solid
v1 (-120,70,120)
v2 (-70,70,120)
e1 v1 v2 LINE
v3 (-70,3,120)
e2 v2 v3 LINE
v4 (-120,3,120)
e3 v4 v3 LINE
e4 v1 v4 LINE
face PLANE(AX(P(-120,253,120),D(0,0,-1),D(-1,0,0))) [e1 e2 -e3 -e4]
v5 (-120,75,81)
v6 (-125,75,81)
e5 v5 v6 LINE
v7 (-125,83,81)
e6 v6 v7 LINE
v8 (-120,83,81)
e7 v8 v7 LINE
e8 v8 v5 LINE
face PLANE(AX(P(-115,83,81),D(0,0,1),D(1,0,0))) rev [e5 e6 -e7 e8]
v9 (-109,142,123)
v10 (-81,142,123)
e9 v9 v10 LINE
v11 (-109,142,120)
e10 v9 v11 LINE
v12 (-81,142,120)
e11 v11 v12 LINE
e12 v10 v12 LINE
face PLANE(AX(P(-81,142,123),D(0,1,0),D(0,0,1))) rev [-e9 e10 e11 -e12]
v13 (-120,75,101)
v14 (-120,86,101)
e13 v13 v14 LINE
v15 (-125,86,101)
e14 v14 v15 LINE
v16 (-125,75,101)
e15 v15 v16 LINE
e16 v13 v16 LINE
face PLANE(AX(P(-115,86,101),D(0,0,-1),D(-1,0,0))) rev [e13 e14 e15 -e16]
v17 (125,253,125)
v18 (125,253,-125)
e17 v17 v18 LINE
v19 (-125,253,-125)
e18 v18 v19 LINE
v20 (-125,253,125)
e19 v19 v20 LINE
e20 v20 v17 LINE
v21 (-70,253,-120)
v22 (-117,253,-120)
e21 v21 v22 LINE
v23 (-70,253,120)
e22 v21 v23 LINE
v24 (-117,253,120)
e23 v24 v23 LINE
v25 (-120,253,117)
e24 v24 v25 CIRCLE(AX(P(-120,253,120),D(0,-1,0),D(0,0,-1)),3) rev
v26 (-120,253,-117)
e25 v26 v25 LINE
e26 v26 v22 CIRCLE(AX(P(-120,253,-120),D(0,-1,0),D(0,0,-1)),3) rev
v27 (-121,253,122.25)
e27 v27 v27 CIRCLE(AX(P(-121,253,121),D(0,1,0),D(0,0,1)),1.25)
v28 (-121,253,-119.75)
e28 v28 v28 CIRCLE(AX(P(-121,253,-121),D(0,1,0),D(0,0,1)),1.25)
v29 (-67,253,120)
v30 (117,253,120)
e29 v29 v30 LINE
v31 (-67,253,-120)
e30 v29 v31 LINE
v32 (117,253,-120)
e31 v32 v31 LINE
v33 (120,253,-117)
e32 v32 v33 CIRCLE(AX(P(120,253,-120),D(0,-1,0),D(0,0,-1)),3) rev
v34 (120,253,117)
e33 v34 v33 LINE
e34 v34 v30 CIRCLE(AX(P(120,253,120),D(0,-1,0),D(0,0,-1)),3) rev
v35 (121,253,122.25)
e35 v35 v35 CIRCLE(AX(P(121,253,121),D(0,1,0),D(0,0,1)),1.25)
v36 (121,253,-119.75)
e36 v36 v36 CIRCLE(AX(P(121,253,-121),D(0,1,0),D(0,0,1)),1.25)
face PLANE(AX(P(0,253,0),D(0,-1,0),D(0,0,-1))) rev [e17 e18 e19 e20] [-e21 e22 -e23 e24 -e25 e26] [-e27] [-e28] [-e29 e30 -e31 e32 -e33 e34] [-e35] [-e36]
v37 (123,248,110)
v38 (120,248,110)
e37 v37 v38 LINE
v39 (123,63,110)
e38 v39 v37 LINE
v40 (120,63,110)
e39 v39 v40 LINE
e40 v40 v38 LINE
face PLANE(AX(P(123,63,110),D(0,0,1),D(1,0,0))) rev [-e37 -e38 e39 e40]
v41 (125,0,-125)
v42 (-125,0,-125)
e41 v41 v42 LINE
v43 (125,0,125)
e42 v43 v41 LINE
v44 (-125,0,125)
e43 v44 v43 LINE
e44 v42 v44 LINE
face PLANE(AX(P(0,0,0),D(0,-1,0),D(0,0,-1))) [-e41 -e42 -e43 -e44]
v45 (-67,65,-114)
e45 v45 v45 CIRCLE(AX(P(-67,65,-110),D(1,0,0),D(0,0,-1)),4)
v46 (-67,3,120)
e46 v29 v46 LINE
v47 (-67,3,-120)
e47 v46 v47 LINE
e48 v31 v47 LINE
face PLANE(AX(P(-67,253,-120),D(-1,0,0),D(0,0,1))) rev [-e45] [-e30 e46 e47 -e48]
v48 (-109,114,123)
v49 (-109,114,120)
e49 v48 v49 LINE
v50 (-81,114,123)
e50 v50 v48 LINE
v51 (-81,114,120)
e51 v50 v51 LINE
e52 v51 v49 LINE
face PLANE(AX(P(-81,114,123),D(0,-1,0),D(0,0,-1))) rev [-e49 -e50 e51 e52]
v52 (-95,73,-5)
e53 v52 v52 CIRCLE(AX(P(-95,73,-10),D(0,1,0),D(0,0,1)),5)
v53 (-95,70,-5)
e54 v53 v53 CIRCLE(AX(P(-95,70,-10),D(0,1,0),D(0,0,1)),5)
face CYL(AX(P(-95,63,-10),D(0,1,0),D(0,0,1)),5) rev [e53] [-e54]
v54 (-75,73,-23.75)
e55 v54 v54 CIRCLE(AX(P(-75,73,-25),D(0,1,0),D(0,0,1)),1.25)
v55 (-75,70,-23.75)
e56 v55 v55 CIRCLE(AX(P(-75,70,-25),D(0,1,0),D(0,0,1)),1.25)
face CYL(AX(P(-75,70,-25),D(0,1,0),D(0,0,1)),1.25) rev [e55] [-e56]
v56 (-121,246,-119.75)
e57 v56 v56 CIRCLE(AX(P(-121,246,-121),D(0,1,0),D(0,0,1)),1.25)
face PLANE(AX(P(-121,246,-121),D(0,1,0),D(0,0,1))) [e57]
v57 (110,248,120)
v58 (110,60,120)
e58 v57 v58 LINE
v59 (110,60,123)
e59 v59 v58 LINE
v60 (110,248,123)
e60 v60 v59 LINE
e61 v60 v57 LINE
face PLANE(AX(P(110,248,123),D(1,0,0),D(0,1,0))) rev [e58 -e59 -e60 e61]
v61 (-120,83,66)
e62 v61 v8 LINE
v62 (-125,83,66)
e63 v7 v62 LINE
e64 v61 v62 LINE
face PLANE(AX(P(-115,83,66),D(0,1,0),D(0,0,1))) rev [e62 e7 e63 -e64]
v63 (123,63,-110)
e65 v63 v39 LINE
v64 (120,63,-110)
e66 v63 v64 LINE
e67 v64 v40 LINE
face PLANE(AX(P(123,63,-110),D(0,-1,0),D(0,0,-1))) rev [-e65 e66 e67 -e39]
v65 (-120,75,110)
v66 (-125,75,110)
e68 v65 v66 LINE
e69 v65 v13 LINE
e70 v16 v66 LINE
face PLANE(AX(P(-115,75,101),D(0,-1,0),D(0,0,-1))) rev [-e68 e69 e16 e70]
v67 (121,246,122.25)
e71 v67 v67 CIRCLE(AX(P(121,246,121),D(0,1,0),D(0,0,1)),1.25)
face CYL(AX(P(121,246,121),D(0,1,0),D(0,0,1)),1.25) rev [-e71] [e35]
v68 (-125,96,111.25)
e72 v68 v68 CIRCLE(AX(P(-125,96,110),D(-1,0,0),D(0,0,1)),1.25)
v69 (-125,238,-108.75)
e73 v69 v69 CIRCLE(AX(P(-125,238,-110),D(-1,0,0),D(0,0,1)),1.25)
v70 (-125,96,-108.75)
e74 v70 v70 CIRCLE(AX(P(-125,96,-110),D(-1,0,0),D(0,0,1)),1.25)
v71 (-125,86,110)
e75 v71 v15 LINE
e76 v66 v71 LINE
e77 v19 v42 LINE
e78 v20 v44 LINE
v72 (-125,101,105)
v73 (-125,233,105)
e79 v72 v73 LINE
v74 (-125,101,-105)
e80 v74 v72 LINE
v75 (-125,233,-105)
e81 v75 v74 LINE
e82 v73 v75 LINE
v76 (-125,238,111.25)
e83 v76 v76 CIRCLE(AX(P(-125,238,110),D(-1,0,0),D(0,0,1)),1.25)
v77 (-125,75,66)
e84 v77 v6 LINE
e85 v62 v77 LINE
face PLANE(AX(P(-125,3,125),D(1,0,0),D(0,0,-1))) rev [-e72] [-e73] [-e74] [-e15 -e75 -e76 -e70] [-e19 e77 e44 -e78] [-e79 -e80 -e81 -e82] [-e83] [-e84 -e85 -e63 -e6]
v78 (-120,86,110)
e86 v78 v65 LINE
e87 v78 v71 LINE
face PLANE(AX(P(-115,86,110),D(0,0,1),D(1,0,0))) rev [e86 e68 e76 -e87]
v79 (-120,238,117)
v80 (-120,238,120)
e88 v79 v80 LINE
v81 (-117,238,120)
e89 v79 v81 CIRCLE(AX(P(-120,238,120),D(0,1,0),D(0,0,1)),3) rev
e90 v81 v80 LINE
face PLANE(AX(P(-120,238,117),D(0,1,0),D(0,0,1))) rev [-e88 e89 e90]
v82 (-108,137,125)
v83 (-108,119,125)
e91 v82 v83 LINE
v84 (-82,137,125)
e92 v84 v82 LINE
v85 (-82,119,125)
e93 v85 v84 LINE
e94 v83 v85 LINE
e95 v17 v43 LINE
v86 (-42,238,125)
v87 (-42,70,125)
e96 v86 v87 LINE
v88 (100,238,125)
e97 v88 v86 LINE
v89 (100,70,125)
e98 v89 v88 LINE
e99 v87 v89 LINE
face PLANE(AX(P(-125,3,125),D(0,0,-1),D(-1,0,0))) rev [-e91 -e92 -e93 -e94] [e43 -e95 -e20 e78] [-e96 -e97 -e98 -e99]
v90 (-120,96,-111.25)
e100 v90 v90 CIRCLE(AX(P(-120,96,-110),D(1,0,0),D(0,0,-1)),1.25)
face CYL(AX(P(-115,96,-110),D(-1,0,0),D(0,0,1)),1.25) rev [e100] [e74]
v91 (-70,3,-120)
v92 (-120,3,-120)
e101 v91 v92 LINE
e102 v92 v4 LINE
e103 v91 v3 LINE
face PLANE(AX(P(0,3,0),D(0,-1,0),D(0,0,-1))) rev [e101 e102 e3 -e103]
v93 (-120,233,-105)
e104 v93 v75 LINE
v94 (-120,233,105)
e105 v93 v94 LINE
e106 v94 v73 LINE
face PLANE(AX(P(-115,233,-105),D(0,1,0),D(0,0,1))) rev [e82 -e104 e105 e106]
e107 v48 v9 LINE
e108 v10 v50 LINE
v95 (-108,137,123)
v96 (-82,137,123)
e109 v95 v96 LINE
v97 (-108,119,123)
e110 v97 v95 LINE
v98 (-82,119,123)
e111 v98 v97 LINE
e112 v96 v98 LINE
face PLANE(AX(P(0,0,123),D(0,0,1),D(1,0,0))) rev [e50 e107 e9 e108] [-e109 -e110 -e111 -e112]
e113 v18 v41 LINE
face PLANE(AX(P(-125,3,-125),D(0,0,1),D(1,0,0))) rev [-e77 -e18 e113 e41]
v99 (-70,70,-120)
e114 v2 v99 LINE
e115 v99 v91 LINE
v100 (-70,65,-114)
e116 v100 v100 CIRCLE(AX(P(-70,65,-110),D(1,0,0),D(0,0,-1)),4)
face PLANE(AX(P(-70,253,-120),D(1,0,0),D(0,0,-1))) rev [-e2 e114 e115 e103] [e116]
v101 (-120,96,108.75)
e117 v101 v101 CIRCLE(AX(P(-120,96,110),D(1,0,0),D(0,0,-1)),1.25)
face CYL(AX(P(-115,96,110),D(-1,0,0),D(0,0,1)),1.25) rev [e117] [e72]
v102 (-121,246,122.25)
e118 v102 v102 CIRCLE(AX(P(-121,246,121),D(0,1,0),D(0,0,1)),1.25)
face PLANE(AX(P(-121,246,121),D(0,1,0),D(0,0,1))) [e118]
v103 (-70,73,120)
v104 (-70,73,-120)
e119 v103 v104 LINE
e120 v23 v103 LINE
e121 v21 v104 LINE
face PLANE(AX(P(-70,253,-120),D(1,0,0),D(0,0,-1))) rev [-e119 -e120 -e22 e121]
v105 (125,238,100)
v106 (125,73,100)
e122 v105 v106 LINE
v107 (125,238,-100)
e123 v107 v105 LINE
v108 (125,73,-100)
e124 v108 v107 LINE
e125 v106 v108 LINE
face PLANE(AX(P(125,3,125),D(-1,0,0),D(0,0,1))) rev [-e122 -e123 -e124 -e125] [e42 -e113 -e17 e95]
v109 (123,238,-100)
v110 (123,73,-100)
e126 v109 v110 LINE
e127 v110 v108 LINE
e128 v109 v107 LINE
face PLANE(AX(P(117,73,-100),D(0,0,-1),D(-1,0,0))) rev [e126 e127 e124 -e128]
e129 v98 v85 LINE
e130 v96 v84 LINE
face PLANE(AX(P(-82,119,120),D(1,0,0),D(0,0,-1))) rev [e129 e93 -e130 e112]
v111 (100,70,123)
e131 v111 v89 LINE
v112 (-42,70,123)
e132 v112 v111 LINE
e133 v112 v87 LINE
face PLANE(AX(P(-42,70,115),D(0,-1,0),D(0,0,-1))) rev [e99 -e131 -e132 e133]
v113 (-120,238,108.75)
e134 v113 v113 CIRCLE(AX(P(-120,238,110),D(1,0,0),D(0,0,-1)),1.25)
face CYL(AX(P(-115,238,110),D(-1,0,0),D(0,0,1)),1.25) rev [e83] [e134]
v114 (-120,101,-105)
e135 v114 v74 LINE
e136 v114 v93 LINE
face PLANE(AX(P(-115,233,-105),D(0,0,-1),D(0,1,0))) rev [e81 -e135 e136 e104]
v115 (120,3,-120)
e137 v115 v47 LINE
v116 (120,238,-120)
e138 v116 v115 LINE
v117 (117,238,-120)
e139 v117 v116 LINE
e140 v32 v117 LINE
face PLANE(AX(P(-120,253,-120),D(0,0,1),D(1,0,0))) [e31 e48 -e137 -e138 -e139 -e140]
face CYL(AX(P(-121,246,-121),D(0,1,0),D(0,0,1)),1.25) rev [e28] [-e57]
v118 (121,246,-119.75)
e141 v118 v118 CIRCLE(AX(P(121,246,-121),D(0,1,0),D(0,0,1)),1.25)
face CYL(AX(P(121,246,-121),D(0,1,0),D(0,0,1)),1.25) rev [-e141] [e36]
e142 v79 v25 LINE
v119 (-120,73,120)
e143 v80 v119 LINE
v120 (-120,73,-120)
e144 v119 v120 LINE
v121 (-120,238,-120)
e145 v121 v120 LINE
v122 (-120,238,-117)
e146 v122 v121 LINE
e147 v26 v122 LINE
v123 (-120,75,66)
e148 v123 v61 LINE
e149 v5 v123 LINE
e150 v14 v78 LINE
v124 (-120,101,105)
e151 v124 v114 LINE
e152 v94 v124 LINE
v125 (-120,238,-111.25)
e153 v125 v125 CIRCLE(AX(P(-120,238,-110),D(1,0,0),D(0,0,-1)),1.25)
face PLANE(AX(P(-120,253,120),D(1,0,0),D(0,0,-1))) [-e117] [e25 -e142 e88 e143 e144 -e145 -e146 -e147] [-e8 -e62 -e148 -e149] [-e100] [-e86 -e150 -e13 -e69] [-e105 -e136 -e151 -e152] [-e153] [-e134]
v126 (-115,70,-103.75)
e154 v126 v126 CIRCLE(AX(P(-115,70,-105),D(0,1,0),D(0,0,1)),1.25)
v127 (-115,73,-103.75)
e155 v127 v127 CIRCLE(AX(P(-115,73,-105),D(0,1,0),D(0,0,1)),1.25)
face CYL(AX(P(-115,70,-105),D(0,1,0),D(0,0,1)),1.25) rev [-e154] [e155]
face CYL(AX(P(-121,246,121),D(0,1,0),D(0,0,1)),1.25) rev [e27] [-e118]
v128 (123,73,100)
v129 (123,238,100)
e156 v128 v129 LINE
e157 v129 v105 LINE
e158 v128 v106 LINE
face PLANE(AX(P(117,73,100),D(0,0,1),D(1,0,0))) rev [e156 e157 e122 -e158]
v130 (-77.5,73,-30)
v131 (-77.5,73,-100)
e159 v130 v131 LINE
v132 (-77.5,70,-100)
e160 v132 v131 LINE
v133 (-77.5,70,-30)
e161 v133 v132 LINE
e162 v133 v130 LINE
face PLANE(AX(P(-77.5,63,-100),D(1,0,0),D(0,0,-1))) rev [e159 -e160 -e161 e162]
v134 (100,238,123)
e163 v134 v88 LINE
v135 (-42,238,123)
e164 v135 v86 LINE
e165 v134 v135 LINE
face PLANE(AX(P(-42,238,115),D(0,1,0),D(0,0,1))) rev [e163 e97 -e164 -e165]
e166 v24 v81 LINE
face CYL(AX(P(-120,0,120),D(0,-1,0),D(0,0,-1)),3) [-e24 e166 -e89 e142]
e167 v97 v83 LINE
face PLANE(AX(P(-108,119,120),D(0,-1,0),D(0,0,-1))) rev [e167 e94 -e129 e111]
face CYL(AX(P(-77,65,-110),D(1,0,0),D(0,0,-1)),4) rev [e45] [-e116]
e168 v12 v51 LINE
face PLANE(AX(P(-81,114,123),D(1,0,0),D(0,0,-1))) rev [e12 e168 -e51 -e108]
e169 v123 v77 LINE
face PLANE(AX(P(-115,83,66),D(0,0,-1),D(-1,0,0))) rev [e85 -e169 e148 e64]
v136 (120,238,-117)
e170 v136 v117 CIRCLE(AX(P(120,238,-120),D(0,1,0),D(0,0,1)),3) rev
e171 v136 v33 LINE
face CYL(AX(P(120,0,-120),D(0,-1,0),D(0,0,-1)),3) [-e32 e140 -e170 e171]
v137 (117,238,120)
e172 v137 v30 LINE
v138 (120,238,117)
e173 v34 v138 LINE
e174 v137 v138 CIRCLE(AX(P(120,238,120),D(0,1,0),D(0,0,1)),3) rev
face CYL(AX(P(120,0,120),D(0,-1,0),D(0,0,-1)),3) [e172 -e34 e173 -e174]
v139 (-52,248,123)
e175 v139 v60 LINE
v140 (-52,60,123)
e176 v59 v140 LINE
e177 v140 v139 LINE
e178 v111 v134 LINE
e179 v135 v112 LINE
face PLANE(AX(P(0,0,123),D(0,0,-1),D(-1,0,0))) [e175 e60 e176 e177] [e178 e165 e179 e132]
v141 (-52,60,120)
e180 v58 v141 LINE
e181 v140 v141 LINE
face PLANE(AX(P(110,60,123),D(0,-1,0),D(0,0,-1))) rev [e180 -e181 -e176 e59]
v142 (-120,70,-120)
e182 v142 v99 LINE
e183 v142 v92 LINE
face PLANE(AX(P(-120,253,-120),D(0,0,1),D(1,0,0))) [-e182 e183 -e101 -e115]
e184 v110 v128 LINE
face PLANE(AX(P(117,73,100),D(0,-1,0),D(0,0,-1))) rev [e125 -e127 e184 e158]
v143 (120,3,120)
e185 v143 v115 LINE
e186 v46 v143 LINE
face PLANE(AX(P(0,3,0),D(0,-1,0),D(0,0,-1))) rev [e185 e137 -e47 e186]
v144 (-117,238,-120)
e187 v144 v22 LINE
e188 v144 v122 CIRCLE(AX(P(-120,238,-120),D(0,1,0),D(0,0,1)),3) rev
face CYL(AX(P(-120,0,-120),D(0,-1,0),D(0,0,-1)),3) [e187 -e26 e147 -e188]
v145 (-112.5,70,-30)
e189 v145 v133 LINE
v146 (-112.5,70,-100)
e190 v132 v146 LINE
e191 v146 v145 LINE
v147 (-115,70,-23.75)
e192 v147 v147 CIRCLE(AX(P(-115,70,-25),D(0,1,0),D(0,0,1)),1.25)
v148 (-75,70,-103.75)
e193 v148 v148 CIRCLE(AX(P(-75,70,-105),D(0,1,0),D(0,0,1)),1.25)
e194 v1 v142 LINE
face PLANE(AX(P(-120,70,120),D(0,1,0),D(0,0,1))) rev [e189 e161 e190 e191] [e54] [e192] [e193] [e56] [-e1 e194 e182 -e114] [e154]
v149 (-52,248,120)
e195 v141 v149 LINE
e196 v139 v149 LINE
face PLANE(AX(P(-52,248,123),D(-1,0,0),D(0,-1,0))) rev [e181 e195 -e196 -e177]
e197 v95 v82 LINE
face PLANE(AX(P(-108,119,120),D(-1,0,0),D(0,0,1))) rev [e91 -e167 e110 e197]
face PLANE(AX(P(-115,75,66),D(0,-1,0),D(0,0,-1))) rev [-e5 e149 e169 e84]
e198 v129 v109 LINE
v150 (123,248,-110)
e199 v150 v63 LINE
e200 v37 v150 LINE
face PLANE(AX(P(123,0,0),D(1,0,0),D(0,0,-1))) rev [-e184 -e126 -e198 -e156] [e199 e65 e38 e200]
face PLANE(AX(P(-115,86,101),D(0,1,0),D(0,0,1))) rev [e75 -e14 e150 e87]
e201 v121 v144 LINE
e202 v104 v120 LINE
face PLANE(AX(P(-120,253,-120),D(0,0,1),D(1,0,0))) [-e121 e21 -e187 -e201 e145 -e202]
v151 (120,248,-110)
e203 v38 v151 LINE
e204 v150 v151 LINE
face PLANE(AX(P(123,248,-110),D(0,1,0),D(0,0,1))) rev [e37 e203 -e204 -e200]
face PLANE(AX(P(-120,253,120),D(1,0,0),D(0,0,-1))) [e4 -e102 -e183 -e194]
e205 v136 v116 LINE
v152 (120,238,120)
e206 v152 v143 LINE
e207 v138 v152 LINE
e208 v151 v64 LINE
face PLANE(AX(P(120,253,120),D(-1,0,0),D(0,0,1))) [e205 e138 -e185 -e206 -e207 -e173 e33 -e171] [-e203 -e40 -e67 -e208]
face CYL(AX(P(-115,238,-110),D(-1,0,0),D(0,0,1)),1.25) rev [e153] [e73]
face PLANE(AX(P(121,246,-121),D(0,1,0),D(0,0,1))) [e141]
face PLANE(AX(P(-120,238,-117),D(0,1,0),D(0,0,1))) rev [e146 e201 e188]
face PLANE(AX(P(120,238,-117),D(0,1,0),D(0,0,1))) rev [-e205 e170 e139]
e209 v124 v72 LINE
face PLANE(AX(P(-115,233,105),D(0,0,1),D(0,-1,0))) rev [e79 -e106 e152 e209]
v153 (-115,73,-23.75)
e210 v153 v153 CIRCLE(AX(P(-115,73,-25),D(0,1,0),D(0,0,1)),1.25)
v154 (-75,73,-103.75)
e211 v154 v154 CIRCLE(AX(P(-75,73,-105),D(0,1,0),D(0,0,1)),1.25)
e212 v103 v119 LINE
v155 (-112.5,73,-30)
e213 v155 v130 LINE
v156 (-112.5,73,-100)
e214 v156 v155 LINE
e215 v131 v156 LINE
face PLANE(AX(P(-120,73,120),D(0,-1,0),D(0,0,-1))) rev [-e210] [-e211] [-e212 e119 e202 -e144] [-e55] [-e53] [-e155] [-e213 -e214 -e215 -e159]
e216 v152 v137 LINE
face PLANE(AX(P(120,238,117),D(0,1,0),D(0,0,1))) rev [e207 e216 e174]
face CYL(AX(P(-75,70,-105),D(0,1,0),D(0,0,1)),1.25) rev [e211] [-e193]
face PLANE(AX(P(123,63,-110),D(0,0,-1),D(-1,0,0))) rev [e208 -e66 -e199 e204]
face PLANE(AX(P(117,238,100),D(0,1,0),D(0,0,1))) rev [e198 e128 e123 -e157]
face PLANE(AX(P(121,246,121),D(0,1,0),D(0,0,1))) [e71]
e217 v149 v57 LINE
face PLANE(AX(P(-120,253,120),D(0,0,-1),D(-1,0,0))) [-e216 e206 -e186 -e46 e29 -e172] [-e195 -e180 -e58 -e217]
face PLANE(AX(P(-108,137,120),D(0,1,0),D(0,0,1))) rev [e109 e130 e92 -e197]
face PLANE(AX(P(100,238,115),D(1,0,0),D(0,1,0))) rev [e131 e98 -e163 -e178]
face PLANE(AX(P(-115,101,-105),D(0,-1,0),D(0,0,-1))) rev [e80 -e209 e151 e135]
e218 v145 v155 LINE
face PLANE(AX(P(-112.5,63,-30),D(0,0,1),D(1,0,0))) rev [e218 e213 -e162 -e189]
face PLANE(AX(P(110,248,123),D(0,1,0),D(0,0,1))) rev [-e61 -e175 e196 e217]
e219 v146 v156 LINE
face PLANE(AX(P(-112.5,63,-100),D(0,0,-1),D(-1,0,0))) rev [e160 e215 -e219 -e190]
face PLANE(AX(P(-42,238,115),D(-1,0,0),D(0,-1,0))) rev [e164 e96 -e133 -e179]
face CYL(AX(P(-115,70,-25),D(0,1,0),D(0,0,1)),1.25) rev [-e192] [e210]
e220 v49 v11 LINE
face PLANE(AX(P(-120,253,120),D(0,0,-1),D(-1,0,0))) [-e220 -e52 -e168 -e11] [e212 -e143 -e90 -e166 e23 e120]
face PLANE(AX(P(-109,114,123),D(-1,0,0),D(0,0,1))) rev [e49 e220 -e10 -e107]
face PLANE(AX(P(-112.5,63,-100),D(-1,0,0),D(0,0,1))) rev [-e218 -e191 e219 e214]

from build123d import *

# Parameters (mm, degrees)
SKETCH_1_W           = 250
SKETCH_1_H           = 250
EXTRUDE_1_DEPTH      = 3
SKETCH_2_W           = 250
SKETCH_2_H           = 250
SKETCH_2_W_2         = 240
SKETCH_2_H_2         = 240
EXTRUDE_2_DEPTH      = 250
SKETCH_3_W           = 3
SKETCH_3_H           = 240
EXTRUDE_3_DEPTH      = 250
SKETCH_8_W           = 200
SKETCH_8_H           = 165
CUT_EXTRUDE_4_DEPTH  = 8
SKETCH_9_W           = 220
SKETCH_9_H           = 185
CUT_EXTRUDE_5_DEPTH  = 3
SKETCH_11_W          = 142
SKETCH_11_H          = 168
CUT_EXTRUDE_6_DEPTH  = 10
SKETCH_12_W          = 162
SKETCH_12_H          = 188
CUT_EXTRUDE_7_DEPTH  = 3
SKETCH_16_W          = 26
SKETCH_16_H          = 18
CUT_EXTRUDE_10_DEPTH = 5
SKETCH_17_W          = 9
SKETCH_17_H          = 11
SKETCH_17_W_2        = 15
SKETCH_17_H_2        = 8
CUT_EXTRUDE_11_DEPTH = 10
SKETCH_21_W          = 28
SKETCH_21_H          = 28
CUT_EXTRUDE_14_DEPTH = 3
SKETCH_22_W          = 50
SKETCH_22_H          = 3
EXTRUDE_4_DEPTH      = 240
SKETCH_24_R          = 4
CUT_EXTRUDE_15_DEPTH = 10
SKETCH_25_W          = 210
SKETCH_25_H          = 132
CUT_EXTRUDE_16_DEPTH = 10
SKETCH_26_R          = 1.25
CUT_EXTRUDE_17_DEPTH = 10
SKETCH_27_R          = 5
CUT_EXTRUDE_18_DEPTH = 10
SKETCH_29_W          = 35
SKETCH_29_H          = 70
CUT_EXTRUDE_19_DEPTH = 10
SKETCH_30_R          = 1.25
CUT_EXTRUDE_20_DEPTH = 3
SKETCH_31_W          = 3
SKETCH_31_H          = 15
EXTRUDE_5_DEPTH      = 3
SKETCH_32_W          = 3
SKETCH_32_H          = 15
EXTRUDE_6_DEPTH      = 3
SKETCH_33_R          = 1.25
CUT_EXTRUDE_21_DEPTH = 7
FILLET_1_R           = 3


with BuildPart() as part:
    # Эскиз1 → Бобышка-Вытянуть1 (new body)
    with BuildSketch(Plane(origin=(0, 0, 0), x_dir=(1, 0, 0), z_dir=(0, 1, 0))):
        Rectangle(SKETCH_1_W, SKETCH_1_H)
    extrude(amount=EXTRUDE_1_DEPTH)

    # Эскиз2 → Бобышка-Вытянуть2 (add)
    with BuildSketch(Plane(origin=(0, 3, 0), x_dir=(1, 0, 0), z_dir=(0, 1, 0))):
        Rectangle(SKETCH_2_W, SKETCH_2_H)
        Rectangle(SKETCH_2_W_2, SKETCH_2_H_2, mode=Mode.SUBTRACT)
    extrude(amount=EXTRUDE_2_DEPTH)

    # Эскиз3 → Бобышка-Вытянуть3 (add)
    with BuildSketch(Plane(origin=(0, 3, 0), x_dir=(1, 0, 0), z_dir=(0, 1, 0))):
        with Locations((-68.5, 0)):
            Rectangle(SKETCH_3_W, SKETCH_3_H)
    extrude(amount=EXTRUDE_3_DEPTH)

    # Эскиз8 → Вырез-Вытянуть4 (cut)
    with BuildSketch(Plane(origin=(125, 0, 0), x_dir=(0, 0, -1), z_dir=(1, 0, 0))):
        with Locations((0, 155.5)):
            Rectangle(SKETCH_8_W, SKETCH_8_H)
    extrude(amount=-CUT_EXTRUDE_4_DEPTH, mode=Mode.SUBTRACT)

    # Эскиз9 → Вырез-Вытянуть5 (cut)
    with BuildSketch(Plane.ZY.offset(-120)):
        with Locations((0, 155.5)):
            Rectangle(SKETCH_9_W, SKETCH_9_H)
    extrude(amount=-CUT_EXTRUDE_5_DEPTH, mode=Mode.SUBTRACT)

    # Эскиз11 → Вырез-Вытянуть6 (cut)
    with BuildSketch(Plane.XY.offset(125)):
        with Locations((29, 154)):
            Rectangle(SKETCH_11_W, SKETCH_11_H)
    extrude(amount=-CUT_EXTRUDE_6_DEPTH, mode=Mode.SUBTRACT)

    # Эскиз12 → Вырез-Вытянуть7 (cut)
    with BuildSketch(Plane(origin=(0, 0, 120), x_dir=(-1, 0, 0), z_dir=(0, 0, -1))):
        with Locations((-29, 154)):
            Rectangle(SKETCH_12_W, SKETCH_12_H)
    extrude(amount=-CUT_EXTRUDE_7_DEPTH, mode=Mode.SUBTRACT)

    # Эскиз16 → Вырез-Вытянуть10 (cut)
    with BuildSketch(Plane.XY.offset(125)):
        with Locations((-95, 128)):
            Rectangle(SKETCH_16_W, SKETCH_16_H)
    extrude(amount=-CUT_EXTRUDE_10_DEPTH, mode=Mode.SUBTRACT)

    # Эскиз17 → Вырез-Вытянуть11 (cut)
    with BuildSketch(Plane.ZY.offset(125)):
        with Locations((105.5, 80.5)):
            Rectangle(SKETCH_17_W, SKETCH_17_H)
        with Locations((73.5, 79)):
            Rectangle(SKETCH_17_W_2, SKETCH_17_H_2)
    extrude(amount=-CUT_EXTRUDE_11_DEPTH, mode=Mode.SUBTRACT)

    # Эскиз21 → Вырез-Вытянуть14 (cut)
    with BuildSketch(Plane(origin=(0, 0, 120), x_dir=(-1, 0, 0), z_dir=(0, 0, -1))):
        with Locations((95, 128)):
            Rectangle(SKETCH_21_W, SKETCH_21_H)
    extrude(amount=-CUT_EXTRUDE_14_DEPTH, mode=Mode.SUBTRACT)

    # Эскиз22 → Бобышка-Вытянуть4 (add)
    with BuildSketch(Plane.XY.offset(-120)):
        with Locations((-95, 71.5)):
            Rectangle(SKETCH_22_W, SKETCH_22_H)
    extrude(amount=EXTRUDE_4_DEPTH)

    # Эскиз24 → Вырез-Вытянуть15 (cut)
    with BuildSketch(Plane(origin=(-67, 0, 0), x_dir=(0, 0, -1), z_dir=(1, 0, 0))):
        with Locations((110, 65)):
            Circle(SKETCH_24_R)
    extrude(amount=-CUT_EXTRUDE_15_DEPTH, mode=Mode.SUBTRACT)

    # Эскиз25 → Вырез-Вытянуть16 (cut)
    with BuildSketch(Plane.ZY.offset(125)):
        with Locations((0, 167)):
            Rectangle(SKETCH_25_W, SKETCH_25_H)
    extrude(amount=-CUT_EXTRUDE_16_DEPTH, mode=Mode.SUBTRACT)

    # Эскиз26 → Вырез-Вытянуть17 (cut)
    with BuildSketch(Plane.ZY.offset(125)):
        with Locations((-110, 238)):
            Circle(SKETCH_26_R)
        with Locations((110, 238)):
            Circle(SKETCH_26_R)
        with Locations((110, 96)):
            Circle(SKETCH_26_R)
        with Locations((-110, 96)):
            Circle(SKETCH_26_R)
    extrude(amount=-CUT_EXTRUDE_17_DEPTH, mode=Mode.SUBTRACT)

    # Эскиз27 → Вырез-Вытянуть18 (cut)
    with BuildSketch(Plane(origin=(0, 73, 0), x_dir=(1, 0, 0), z_dir=(0, 1, 0))):
        with Locations(Location((-95, 10, 0), (0, 0, 270))):
            Circle(SKETCH_27_R)
    extrude(amount=-CUT_EXTRUDE_18_DEPTH, mode=Mode.SUBTRACT)

    # Эскиз29 → Вырез-Вытянуть19 (cut)
    with BuildSketch(Plane(origin=(0, 73, 0), x_dir=(1, 0, 0), z_dir=(0, 1, 0))):
        with Locations((-95, 65)):
            Rectangle(SKETCH_29_W, SKETCH_29_H)
    extrude(amount=-CUT_EXTRUDE_19_DEPTH, mode=Mode.SUBTRACT)

    # Эскиз30 → Вырез-Вытянуть20 (cut)
    with BuildSketch(Plane(origin=(0, 73, 0), x_dir=(1, 0, 0), z_dir=(0, 1, 0))):
        with Locations(Location((-75, 105, 0), (0, 0, 270))):
            Circle(SKETCH_30_R)
        with Locations(Location((-115, 105, 0), (0, 0, 270))):
            Circle(SKETCH_30_R)
        with Locations(Location((-115, 25, 0), (0, 0, 270))):
            Circle(SKETCH_30_R)
        with Locations(Location((-75, 25, 0), (0, 0, 270))):
            Circle(SKETCH_30_R)
    extrude(amount=-CUT_EXTRUDE_20_DEPTH, mode=Mode.SUBTRACT)

    # Эскиз31 → Бобышка-Вытянуть5 (add)
    with BuildSketch(Plane.XY.offset(-120)):
        with Locations((118.5, 245.5)):
            Rectangle(SKETCH_31_W, SKETCH_31_H)
        with Locations((-118.5, 245.5)):
            Rectangle(SKETCH_31_W, SKETCH_31_H)
    extrude(amount=EXTRUDE_5_DEPTH)

    # Эскиз32 → Бобышка-Вытянуть6 (add)
    with BuildSketch(Plane(origin=(0, 0, 120), x_dir=(-1, 0, 0), z_dir=(0, 0, -1))):
        with Locations((-118.5, 245.5)):
            Rectangle(SKETCH_32_W, SKETCH_32_H)
        with Locations((118.5, 245.5)):
            Rectangle(SKETCH_32_W, SKETCH_32_H)
    extrude(amount=EXTRUDE_6_DEPTH)

    # Эскиз33 → Вырез-Вытянуть21 (cut)
    with BuildSketch(Plane(origin=(0, 253, 0), x_dir=(1, 0, 0), z_dir=(0, 1, 0))):
        with Locations(Location((-121, -121, 0), (0, 0, 270))):
            Circle(SKETCH_33_R)
        with Locations(Location((-121, 121, 0), (0, 0, 270))):
            Circle(SKETCH_33_R)
        with Locations(Location((121, 121, 0), (0, 0, 270))):
            Circle(SKETCH_33_R)
        with Locations(Location((121, -121, 0), (0, 0, 270))):
            Circle(SKETCH_33_R)
    extrude(amount=-CUT_EXTRUDE_21_DEPTH, mode=Mode.SUBTRACT)

    # Скругление1
    fillet_1_edges = [part.edges().sort_by_distance(p)[0] for p in [
        (117, 245.5, -117),
        (-117, 245.5, -117),
        (117, 245.5, 117),
        (-117, 245.5, 117),
    ]]
    fillet(fillet_1_edges, radius=FILLET_1_R - 0.0001)  # a hair under: the kernel refuses the full size


solid = part.part
